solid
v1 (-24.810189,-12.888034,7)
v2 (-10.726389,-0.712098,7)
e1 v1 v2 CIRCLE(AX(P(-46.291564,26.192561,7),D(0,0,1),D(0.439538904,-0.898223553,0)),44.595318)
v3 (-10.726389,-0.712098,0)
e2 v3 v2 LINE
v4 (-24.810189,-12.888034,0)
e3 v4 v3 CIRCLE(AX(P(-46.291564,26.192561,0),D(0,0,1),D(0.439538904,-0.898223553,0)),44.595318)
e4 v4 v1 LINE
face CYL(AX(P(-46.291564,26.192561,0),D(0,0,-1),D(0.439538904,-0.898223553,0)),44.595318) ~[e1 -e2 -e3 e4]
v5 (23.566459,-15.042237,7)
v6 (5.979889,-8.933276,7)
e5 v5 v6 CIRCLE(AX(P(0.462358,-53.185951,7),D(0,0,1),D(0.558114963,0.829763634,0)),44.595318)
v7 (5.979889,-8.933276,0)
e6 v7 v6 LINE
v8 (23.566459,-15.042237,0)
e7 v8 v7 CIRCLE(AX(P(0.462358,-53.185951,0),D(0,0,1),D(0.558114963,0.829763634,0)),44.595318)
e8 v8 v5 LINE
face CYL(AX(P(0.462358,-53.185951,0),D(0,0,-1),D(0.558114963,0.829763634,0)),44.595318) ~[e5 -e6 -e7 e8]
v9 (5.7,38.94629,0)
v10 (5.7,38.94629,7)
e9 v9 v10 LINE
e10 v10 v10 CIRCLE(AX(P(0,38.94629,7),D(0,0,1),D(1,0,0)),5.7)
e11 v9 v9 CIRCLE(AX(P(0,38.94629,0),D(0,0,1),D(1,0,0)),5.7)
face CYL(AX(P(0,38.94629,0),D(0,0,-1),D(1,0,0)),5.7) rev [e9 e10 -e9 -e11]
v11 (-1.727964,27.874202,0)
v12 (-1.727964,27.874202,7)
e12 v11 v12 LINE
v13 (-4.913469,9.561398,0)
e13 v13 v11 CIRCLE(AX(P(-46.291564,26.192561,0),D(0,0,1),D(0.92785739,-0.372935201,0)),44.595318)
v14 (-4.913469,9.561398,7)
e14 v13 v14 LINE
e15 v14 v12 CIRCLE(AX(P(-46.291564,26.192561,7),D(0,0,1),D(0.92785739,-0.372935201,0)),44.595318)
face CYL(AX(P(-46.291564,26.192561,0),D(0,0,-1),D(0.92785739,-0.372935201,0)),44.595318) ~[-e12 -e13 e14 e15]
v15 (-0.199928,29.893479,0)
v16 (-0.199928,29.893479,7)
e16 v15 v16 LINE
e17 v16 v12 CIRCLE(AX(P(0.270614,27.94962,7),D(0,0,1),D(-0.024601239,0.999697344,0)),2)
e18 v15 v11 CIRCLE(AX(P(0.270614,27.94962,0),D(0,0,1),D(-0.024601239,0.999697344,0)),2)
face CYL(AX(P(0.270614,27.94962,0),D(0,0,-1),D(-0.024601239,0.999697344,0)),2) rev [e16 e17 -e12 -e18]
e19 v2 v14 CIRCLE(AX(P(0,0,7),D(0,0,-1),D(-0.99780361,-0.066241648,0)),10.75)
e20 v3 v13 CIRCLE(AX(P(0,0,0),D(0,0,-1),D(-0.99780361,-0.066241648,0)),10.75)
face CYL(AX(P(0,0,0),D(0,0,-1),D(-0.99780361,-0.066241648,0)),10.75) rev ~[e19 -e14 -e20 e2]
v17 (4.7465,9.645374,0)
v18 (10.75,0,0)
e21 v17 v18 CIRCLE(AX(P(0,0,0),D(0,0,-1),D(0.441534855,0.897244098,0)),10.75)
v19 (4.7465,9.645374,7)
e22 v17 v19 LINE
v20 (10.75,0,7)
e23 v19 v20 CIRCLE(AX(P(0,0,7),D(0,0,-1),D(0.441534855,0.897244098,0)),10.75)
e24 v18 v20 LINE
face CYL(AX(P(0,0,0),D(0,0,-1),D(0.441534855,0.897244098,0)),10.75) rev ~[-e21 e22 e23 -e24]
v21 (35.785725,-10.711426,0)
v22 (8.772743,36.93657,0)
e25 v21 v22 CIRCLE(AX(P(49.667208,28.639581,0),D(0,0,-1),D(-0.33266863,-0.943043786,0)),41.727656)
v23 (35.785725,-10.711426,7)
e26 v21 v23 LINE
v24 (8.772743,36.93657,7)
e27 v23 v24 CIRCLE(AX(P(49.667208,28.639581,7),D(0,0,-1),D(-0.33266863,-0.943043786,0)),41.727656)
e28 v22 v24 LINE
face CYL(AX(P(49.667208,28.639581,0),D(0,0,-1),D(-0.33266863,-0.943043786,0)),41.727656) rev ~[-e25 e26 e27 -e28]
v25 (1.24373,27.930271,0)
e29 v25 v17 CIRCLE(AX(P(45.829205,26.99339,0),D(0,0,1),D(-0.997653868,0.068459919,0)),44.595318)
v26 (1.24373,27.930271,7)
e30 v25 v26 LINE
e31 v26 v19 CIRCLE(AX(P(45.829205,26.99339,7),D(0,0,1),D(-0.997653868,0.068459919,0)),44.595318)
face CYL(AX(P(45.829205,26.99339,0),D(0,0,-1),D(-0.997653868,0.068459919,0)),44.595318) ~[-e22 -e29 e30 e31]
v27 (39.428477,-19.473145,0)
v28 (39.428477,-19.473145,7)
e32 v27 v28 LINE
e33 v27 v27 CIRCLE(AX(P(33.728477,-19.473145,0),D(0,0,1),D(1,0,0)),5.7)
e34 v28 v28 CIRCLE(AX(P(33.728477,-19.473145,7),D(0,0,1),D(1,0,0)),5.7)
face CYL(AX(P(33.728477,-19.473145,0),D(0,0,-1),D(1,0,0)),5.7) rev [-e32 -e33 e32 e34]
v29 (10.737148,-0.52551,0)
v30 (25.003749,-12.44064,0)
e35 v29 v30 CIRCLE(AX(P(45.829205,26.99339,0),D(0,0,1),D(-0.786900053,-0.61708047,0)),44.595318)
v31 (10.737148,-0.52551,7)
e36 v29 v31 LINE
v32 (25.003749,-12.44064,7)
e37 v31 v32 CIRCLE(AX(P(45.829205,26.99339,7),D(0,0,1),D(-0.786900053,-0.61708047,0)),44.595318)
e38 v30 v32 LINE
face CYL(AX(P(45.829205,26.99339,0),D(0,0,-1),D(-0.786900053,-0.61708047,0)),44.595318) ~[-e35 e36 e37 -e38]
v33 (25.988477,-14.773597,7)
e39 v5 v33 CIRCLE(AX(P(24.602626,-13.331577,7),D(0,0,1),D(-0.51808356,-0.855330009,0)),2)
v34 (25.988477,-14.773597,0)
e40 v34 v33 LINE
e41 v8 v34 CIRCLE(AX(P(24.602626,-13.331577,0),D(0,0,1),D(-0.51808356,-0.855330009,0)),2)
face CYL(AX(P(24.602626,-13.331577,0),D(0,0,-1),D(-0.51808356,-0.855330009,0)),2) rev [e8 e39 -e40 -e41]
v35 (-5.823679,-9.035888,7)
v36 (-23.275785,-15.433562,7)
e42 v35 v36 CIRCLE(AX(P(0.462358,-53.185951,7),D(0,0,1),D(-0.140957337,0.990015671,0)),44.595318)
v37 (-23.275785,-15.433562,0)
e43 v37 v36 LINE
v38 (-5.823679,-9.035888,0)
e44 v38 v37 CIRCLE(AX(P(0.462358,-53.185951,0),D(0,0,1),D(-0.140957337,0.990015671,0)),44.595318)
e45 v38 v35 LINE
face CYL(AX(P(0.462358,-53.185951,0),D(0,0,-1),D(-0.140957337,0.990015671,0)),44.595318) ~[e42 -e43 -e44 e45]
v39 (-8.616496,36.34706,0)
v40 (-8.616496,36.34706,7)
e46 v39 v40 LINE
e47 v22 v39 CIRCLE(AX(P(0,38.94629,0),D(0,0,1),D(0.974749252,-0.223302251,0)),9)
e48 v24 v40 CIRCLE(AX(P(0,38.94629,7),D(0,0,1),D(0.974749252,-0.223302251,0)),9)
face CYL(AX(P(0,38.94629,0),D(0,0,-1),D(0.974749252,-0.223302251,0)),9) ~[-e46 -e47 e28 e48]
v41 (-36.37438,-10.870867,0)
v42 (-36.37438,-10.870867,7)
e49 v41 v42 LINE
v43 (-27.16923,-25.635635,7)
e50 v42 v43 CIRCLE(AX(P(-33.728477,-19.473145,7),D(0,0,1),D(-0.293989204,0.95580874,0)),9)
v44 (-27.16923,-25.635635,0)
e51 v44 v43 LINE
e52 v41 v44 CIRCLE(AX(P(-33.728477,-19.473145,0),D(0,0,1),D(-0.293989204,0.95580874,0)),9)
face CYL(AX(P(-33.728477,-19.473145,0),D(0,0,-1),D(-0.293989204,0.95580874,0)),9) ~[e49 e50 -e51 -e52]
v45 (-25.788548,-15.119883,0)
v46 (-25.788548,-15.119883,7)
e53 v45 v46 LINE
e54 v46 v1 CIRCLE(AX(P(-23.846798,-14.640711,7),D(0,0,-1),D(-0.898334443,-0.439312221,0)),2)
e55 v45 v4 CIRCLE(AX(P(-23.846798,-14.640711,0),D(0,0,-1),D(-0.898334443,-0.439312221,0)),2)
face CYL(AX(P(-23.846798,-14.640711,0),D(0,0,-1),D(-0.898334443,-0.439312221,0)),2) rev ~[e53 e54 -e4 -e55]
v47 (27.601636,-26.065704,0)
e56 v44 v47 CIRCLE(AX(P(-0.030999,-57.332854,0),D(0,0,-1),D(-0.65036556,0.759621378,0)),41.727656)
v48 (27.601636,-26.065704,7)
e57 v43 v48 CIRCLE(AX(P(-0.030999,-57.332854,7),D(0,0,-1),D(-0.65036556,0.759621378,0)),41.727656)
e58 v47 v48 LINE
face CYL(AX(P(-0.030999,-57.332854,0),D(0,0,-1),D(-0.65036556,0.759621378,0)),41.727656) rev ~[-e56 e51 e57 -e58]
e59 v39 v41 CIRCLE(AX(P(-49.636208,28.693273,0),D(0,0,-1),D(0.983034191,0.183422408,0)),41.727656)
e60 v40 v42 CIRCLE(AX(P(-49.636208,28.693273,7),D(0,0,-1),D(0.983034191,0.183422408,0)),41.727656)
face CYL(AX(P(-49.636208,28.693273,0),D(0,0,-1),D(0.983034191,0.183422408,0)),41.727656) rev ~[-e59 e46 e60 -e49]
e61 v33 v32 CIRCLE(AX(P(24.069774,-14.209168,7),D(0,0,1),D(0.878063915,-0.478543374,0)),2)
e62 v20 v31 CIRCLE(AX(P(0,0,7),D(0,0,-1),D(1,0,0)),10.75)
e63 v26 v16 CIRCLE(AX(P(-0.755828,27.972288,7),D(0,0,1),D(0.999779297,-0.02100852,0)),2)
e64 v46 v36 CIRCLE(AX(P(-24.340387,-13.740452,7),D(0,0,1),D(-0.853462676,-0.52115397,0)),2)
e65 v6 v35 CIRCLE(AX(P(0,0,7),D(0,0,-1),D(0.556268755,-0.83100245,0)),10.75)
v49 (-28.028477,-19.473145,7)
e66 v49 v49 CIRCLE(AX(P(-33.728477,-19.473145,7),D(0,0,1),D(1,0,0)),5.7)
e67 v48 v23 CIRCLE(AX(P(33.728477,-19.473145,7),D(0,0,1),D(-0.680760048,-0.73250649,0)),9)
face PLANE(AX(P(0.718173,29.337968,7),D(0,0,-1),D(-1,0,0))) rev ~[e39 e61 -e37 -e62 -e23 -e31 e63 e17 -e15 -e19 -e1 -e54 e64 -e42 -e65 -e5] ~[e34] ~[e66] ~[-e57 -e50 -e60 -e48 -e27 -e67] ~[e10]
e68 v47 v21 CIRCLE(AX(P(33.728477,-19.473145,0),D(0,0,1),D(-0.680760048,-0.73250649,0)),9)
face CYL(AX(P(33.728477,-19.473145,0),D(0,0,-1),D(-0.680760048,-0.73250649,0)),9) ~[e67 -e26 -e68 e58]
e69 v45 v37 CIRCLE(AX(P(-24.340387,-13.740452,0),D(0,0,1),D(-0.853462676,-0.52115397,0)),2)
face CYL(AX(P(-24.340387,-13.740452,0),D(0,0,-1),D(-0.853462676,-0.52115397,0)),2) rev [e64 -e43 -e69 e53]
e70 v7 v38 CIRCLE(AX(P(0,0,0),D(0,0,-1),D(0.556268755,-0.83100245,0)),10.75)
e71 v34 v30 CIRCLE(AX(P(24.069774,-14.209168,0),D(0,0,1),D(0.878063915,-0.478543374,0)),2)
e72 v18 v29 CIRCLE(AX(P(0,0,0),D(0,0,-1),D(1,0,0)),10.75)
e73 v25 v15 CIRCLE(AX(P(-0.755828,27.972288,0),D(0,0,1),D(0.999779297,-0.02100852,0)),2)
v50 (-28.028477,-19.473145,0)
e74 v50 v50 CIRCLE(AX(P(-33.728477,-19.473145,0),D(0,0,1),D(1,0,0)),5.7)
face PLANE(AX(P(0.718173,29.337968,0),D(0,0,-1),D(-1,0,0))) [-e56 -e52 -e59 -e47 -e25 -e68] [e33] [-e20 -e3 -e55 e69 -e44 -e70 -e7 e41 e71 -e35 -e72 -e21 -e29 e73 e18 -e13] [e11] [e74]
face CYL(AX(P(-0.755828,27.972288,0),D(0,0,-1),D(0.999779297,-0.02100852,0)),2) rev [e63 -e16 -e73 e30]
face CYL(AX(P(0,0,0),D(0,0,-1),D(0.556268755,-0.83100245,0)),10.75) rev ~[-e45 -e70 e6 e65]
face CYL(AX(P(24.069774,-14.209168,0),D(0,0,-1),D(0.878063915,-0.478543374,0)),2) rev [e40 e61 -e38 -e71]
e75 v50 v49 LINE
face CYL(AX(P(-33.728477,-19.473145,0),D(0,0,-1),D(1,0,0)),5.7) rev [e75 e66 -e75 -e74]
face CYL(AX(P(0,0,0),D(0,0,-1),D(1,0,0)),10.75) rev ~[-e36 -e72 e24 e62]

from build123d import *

# Parameters (mm, degrees)
F0_R        = 5.7
F1_DEPTH    = 7
F2_T1_DEPTH = 7


# Not quite as in the source:
# - a fillet or chamfer that OpenCascade refuses, or shapes differently, is made with other operations: its cross-section is extruded or revolved along the edge and cut away or added


with BuildPart() as f1:
    # F0 (on Top) → F1 (new body)
    with BuildSketch(Plane.XY):
        with BuildLine():
            ThreePointArc((35.7857254885, -10.7114257283), (13.3672908486, 8.0601420356), (8.7727432709, 36.9365701488))
            ThreePointArc((8.7727432709, 36.9365701488), (-0.3049324387, 47.9411231542), (-8.6164959528, 36.3470602301))
            ThreePointArc((-8.6164959528, 36.3470602301), (-13.6639331853, 7.5463424369), (-36.374379713, -10.8708665409))
            ThreePointArc((-36.374379713, -10.8708665409), (-41.3657643181, -24.2346408155), (-27.1692295357, -25.6356345017))
            ThreePointArc((-27.1692295357, -25.6356345017), (0.2966423367, -15.6064844725), (27.6016364421, -26.0657036079))
            ThreePointArc((27.6016364421, -26.0657036079), (41.6706967568, -23.7064823387), (35.7857254885, -10.7114257283))
        make_face()
        with Locations((-33.7284768728, -19.4731452019)):
            Circle(F0_R, mode=Mode.SUBTRACT)
        with Locations((33.7284768728, -19.4731452019)):
            Circle(F0_R, mode=Mode.SUBTRACT)
        with BuildLine():
            ThreePointArc((4.7464996897, 9.6453740568), (9.1265374503, 5.6805645994), (10.75, 0))
            ThreePointArc((10.75, 0), (10.7467864276, -0.2628335582), (10.7371476318, -0.5255099751))
            ThreePointArc((10.7371476318, -0.5255099751), (18.1244877352, -7.9521533479), (27.0404212358, -13.4506945549))
            ThreePointArc((27.0404212358, -13.4506945549), (26.0732155549, -14.7406010495), (25.3516724639, -16.1823781342))
            ThreePointArc((25.3516724639, -16.1823781342), (16.0918632419, -11.4192065952), (5.9798891173, -8.9332763388))
            ThreePointArc((5.9798891173, -8.9332763388), (0.0934488338, -10.749593821), (-5.8236788043, -9.0358876257))
            ThreePointArc((-5.8236788043, -9.0358876257), (-15.9490106817, -11.7201901353), (-25.168853801, -16.6923444418))
            ThreePointArc((-25.168853801, -16.6923444418), (-25.8023427534, -15.2097665041), (-26.6901867898, -13.864003315))
            ThreePointArc((-26.6901867898, -13.864003315), (-17.9352546235, -8.2263590641), (-10.726388807, -0.712097718))
            ThreePointArc((-10.726388807, -0.712097718), (-9.3561457462, 5.2938678465), (-4.9134688275, 9.5613976008))
            ThreePointArc((-4.9134688275, 9.5613976008), (-2.1754770535, 19.6723434832), (-1.8715674348, 30.1430389967))
            ThreePointArc((-1.8715674348, 30.1430389967), (-0.2708728015, 29.9503675537), (1.3385143259, 30.0463814492))
            ThreePointArc((1.3385143259, 30.0463814492), (1.8433913815, 19.6455656593), (4.7464996897, 9.6453740568))
        make_face(mode=Mode.SUBTRACT)
        with Locations((0, 38.9462904038)):
            Circle(F0_R, mode=Mode.SUBTRACT)
    extrude(amount=F1_DEPTH)

    # F2: fillet of radius 2 on 6 edges, made by hand

    # F2_s2 → F2_t1 (join)
    with BuildSketch(Plane.XY):
        with BuildLine():
            ThreePointArc((1.2437301381, 27.9302712072), (0.7204204263, 29.321617428), (-0.6184050998, 29.9675613661))
            ThreePointArc((-0.6184050998, 29.9675613661), (0.362205019, 29.9535818283), (1.3385143259, 30.0463814492))
            ThreePointArc((1.3385143259, 30.0463814492), (1.278556326, 28.9888891766), (1.2437301381, 27.9302712072))
        make_face()
        with BuildLine():
            ThreePointArc((0.2214111543, 29.9490143104), (-1.1869742591, 29.3190857733), (-1.7279638998, 27.8742018185))
            ThreePointArc((-1.7279638998, 27.8742018185), (-1.7853057388, 29.0095356327), (-1.8715674348, 30.1430389967))
            ThreePointArc((-1.8715674348, 30.1430389967), (-0.8307618987, 29.984714947), (0.2214111543, 29.9490143104))
        make_face()
        with BuildLine():
            ThreePointArc((23.566459331, -15.0422374987), (25.0330553595, -15.2847111045), (26.2618719824, -14.4482261568))
            ThreePointArc((26.2618719824, -14.4482261568), (25.7594602881, -15.290469662), (25.3516724639, -16.1823781342))
            ThreePointArc((25.3516724639, -16.1823781342), (24.4658362914, -15.6017068468), (23.566459331, -15.0422374987))
        make_face()
        with BuildLine():
            ThreePointArc((25.825901634, -15.1662548395), (25.9845602249, -13.6315930247), (25.0037488349, -12.4406402752))
            ThreePointArc((25.0037488349, -12.4406402752), (26.0156476793, -12.958647693), (27.0404212358, -13.4506945549))
            ThreePointArc((27.0404212358, -13.4506945549), (26.3829058187, -14.2728965647), (25.825901634, -15.1662548395))
        make_face()
        with BuildLine():
            ThreePointArc((-25.6434668826, -15.5193352093), (-25.7534757858, -14.0369063234), (-24.8101894691, -12.8880337086))
            ThreePointArc((-24.8101894691, -12.8880337086), (-25.7443926174, -13.3871823298), (-26.6901867898, -13.864003315))
            ThreePointArc((-26.6901867898, -13.864003315), (-26.1216653071, -14.6631121663), (-25.6434668826, -15.5193352093))
        make_face()
        with BuildLine():
            ThreePointArc((-26.0473127882, -14.7827594709), (-24.7975859659, -15.6874927486), (-23.2757849351, -15.4335615433))
            ThreePointArc((-23.2757849351, -15.4335615433), (-24.2303419405, -16.0508879397), (-25.168853801, -16.6923444418))
            ThreePointArc((-25.168853801, -16.6923444418), (-25.55214392, -15.7118183822), (-26.0473127882, -14.7827594709))
        make_face()
    extrude(amount=F2_T1_DEPTH)


solid = f1.part
